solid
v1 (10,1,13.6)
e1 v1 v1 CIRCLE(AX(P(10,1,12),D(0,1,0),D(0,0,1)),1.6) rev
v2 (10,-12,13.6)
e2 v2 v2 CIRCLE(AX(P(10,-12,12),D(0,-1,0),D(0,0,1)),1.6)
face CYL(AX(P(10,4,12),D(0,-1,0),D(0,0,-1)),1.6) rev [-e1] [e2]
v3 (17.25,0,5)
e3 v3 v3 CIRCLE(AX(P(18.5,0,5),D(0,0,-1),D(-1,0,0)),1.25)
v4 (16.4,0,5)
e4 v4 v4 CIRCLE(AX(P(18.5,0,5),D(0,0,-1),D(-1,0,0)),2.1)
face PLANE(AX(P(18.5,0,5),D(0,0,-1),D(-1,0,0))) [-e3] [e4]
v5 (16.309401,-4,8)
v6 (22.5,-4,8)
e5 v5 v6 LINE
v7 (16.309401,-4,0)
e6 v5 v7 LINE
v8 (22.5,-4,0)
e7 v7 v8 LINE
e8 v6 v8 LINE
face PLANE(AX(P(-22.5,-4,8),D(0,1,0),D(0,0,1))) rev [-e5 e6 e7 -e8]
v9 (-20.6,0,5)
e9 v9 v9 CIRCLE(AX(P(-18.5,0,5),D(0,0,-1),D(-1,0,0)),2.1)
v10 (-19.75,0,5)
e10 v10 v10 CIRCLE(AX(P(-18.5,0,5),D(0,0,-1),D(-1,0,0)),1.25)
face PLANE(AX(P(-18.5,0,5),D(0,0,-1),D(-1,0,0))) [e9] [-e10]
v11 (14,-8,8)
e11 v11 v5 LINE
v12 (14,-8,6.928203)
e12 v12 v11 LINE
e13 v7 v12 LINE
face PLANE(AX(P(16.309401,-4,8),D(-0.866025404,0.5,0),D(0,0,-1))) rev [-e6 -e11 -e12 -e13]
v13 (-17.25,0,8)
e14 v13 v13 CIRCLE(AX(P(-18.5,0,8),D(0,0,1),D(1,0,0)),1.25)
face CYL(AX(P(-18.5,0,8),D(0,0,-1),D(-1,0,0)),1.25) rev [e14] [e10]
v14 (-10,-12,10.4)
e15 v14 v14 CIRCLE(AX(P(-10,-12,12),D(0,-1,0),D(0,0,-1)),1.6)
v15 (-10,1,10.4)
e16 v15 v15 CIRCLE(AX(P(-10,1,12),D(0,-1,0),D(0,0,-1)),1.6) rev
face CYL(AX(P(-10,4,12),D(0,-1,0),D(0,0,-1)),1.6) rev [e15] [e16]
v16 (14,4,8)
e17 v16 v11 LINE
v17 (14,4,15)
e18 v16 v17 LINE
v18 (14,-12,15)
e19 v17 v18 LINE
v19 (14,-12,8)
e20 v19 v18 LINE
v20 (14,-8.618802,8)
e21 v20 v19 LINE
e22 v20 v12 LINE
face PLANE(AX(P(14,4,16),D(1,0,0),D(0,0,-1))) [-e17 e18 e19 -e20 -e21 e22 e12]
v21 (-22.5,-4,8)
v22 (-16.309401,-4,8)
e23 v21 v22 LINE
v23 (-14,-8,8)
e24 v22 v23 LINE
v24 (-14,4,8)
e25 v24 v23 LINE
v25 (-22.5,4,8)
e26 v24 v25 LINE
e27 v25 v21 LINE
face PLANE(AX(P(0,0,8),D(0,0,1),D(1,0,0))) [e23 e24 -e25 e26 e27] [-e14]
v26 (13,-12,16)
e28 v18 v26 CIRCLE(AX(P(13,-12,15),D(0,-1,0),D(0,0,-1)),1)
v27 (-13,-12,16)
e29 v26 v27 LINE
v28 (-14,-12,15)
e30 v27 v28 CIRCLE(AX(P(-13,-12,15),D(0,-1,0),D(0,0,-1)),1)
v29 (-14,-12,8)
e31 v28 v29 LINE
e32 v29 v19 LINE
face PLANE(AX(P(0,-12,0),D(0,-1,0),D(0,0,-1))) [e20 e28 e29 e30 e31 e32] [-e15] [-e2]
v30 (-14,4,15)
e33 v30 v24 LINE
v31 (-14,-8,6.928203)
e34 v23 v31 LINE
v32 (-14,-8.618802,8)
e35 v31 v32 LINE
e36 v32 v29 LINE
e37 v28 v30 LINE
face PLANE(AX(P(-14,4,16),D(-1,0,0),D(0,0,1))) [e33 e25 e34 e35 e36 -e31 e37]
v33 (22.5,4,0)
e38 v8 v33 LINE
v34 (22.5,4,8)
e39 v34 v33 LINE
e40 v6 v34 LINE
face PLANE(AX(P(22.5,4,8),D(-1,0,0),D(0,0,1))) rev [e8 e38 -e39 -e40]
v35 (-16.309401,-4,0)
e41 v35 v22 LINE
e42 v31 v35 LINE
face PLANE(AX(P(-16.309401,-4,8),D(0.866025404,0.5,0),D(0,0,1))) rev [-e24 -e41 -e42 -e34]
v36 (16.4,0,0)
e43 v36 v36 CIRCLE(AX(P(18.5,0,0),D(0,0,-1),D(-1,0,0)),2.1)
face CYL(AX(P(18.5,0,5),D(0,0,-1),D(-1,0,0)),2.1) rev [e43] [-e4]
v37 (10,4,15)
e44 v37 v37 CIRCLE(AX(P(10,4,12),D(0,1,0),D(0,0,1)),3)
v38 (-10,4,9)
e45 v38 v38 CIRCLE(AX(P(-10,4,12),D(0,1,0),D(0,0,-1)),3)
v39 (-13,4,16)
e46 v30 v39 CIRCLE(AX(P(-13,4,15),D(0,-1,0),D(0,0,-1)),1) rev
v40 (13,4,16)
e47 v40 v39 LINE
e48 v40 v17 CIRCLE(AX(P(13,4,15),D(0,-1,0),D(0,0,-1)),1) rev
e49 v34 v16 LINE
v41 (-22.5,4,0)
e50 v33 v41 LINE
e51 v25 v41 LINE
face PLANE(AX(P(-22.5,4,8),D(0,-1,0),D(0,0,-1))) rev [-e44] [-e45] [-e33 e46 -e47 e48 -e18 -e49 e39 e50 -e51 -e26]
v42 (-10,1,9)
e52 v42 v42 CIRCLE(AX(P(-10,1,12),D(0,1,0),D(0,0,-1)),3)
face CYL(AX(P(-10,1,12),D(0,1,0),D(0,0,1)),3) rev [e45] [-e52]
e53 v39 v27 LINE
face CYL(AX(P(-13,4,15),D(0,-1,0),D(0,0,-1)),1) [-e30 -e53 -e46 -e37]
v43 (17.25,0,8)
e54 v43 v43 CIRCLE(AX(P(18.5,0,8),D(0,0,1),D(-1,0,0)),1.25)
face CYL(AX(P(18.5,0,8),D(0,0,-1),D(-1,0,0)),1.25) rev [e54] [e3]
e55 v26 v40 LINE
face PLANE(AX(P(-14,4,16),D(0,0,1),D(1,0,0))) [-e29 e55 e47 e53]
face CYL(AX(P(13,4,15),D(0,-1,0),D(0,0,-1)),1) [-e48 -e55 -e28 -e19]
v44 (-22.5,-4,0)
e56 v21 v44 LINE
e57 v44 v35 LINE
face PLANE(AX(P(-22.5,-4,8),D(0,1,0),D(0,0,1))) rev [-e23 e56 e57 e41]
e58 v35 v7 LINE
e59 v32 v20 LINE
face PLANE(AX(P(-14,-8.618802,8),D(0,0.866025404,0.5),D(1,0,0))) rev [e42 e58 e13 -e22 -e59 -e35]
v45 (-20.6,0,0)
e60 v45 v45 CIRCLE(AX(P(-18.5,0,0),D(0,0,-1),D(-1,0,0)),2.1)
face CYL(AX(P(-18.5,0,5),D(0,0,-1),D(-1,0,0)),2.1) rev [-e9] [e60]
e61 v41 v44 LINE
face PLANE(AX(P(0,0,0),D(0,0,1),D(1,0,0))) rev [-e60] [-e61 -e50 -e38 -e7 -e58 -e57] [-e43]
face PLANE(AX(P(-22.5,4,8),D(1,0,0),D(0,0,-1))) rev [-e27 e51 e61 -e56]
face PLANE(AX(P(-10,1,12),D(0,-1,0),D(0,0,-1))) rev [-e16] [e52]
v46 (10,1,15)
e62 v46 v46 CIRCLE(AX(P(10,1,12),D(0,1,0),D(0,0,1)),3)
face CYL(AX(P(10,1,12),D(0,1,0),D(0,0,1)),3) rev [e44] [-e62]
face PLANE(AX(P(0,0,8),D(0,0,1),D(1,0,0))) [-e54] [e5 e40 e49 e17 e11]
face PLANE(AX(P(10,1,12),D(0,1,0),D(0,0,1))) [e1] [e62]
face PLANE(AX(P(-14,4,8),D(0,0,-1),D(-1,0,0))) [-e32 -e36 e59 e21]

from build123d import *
from OCP.BRepFilletAPI import BRepFilletAPI_MakeChamfer

# Parameters (mm, degrees)
SKETCH_1_W           = 45
SKETCH_1_H           = 8
SKETCH_1_R           = 1.25
EXTRUDE_1_DEPTH      = 8
EXTRUDE_2_DEPTH      = 8
EXTRUDE_2_DEPTH_BACK = 8
SKETCH_2_W           = 28
SKETCH_2_H           = 8
SKETCH_2_R           = 1.6
SKETCH_4_R           = 3
CUT_EXTRUDE_2_DEPTH  = 3
FILLET_1_R           = 1
CHAMFER_1_SIZE2      = 8
CHAMFER_1_SIZE       = 4.618802154
CHAMFER_2_SIZE       = 4
CHAMFER_2_SIZE2      = 2.309401077
SKETCH_5_R           = 2.1
CUT_EXTRUDE_3_DEPTH  = 5


with BuildPart() as part:
    # ｽｹｯﾁ1 → ﾎﾞｽ - 押し出し1 (new body)
    with BuildSketch(Plane.XY):
        Rectangle(SKETCH_1_W, SKETCH_1_H)
        with Locations((-18.5, 0)):
            Circle(SKETCH_1_R, mode=Mode.SUBTRACT)
        with Locations(Location((18.5, 0, 0), (0, 0, 180))):
            Circle(SKETCH_1_R, mode=Mode.SUBTRACT)
    extrude(amount=EXTRUDE_1_DEPTH)

    # ｽｹｯﾁ2 → ﾎﾞｽ - 押し出し2 (add, two sides: drawn at the far end of the back side and taken through both)
    with BuildSketch(Plane.XZ.offset(4).offset(-EXTRUDE_2_DEPTH_BACK)):
        with Locations((0, 12)):
            Rectangle(SKETCH_2_W, SKETCH_2_H)
        with Locations(Location((-10, 12, 0), (0, 0, 270))):
            Circle(SKETCH_2_R, mode=Mode.SUBTRACT)
        with Locations(Location((10, 12, 0), (0, 0, 90))):
            Circle(SKETCH_2_R, mode=Mode.SUBTRACT)
    extrude(amount=EXTRUDE_2_DEPTH + EXTRUDE_2_DEPTH_BACK)

    # ｽｹｯﾁ4 → ｶｯﾄ - 押し出し2 (cut)
    with BuildSketch(Plane(origin=(0, 4, 0), x_dir=(1, 0, 0), z_dir=(0, 1, 0))):
        with Locations(Location((10, -12, 0), (0, 0, 270))):
            Circle(SKETCH_4_R)
        with Locations(Location((-10, -12, 0), (0, 0, 90))):
            Circle(SKETCH_4_R)
    extrude(amount=-CUT_EXTRUDE_2_DEPTH, mode=Mode.SUBTRACT)

    # ﾌｨﾚｯﾄ1
    fillet_1_edges = [part.edges().sort_by_distance(p)[0] for p in [
        (14, -4, 16),
        (-14, -4, 16),
    ]]
    fillet(fillet_1_edges, radius=FILLET_1_R)

    # 面取り1
    chamfer_1_edges = [part.edges().sort_by_distance(p)[0] for p in [
        (0, -4, 8),
    ]]
    chamfer_1_side = [part.faces().sort_by_distance(p)[0] for p in [
        (0, -4.092376043, 8),
    ]]
    chamfer(chamfer_1_edges, length=CHAMFER_1_SIZE - 0.0001, length2=CHAMFER_1_SIZE2 - 0.0001, reference=chamfer_1_side[0])  # a hair under: the kernel refuses the full size

    # 面取り2: one chamfer whose edges measure the first distance from different faces: ONE call of the kernel's chamfer builder (chamfer() names one face for all edges)
    chamfer_2_edges_1 = [part.edges().sort_by_distance(p)[0] for p in [
        (-14, -4, 4.00005),
    ]]
    chamfer_2_side_1 = [part.faces().sort_by_distance(p)[0] for p in [
        (-14, -4.217995396, 10.626834142),
    ]]
    chamfer_2_edges_2 = [part.edges().sort_by_distance(p)[0] for p in [
        (14, -4, 4.00005),
    ]]
    chamfer_2_side_2 = [part.faces().sort_by_distance(p)[0] for p in [
        (14, -4.217995396, 10.626834142),
    ]]
    chamfer_2 = BRepFilletAPI_MakeChamfer(part.part.solid().wrapped)
    for e in chamfer_2_edges_1:
        chamfer_2.Add(CHAMFER_2_SIZE, CHAMFER_2_SIZE2, e.wrapped, chamfer_2_side_1[0].wrapped)  # the first distance lies on this face
    for e in chamfer_2_edges_2:
        chamfer_2.Add(CHAMFER_2_SIZE, CHAMFER_2_SIZE2, e.wrapped, chamfer_2_side_2[0].wrapped)  # the first distance lies on this face
    add(Compound.cast(chamfer_2.Shape()), mode=Mode.REPLACE)

    # ｽｹｯﾁ5 → ｶｯﾄ - 押し出し3 (cut)
    with BuildSketch(Plane(origin=(0, 0, 0), x_dir=(-1, 0, 0), z_dir=(0, 0, -1))):
        with Locations((-18.5, 0)):
            Circle(SKETCH_5_R)
        with Locations((18.5, 0)):
            Circle(SKETCH_5_R)
    extrude(amount=-CUT_EXTRUDE_3_DEPTH, mode=Mode.SUBTRACT)


solid = part.part
